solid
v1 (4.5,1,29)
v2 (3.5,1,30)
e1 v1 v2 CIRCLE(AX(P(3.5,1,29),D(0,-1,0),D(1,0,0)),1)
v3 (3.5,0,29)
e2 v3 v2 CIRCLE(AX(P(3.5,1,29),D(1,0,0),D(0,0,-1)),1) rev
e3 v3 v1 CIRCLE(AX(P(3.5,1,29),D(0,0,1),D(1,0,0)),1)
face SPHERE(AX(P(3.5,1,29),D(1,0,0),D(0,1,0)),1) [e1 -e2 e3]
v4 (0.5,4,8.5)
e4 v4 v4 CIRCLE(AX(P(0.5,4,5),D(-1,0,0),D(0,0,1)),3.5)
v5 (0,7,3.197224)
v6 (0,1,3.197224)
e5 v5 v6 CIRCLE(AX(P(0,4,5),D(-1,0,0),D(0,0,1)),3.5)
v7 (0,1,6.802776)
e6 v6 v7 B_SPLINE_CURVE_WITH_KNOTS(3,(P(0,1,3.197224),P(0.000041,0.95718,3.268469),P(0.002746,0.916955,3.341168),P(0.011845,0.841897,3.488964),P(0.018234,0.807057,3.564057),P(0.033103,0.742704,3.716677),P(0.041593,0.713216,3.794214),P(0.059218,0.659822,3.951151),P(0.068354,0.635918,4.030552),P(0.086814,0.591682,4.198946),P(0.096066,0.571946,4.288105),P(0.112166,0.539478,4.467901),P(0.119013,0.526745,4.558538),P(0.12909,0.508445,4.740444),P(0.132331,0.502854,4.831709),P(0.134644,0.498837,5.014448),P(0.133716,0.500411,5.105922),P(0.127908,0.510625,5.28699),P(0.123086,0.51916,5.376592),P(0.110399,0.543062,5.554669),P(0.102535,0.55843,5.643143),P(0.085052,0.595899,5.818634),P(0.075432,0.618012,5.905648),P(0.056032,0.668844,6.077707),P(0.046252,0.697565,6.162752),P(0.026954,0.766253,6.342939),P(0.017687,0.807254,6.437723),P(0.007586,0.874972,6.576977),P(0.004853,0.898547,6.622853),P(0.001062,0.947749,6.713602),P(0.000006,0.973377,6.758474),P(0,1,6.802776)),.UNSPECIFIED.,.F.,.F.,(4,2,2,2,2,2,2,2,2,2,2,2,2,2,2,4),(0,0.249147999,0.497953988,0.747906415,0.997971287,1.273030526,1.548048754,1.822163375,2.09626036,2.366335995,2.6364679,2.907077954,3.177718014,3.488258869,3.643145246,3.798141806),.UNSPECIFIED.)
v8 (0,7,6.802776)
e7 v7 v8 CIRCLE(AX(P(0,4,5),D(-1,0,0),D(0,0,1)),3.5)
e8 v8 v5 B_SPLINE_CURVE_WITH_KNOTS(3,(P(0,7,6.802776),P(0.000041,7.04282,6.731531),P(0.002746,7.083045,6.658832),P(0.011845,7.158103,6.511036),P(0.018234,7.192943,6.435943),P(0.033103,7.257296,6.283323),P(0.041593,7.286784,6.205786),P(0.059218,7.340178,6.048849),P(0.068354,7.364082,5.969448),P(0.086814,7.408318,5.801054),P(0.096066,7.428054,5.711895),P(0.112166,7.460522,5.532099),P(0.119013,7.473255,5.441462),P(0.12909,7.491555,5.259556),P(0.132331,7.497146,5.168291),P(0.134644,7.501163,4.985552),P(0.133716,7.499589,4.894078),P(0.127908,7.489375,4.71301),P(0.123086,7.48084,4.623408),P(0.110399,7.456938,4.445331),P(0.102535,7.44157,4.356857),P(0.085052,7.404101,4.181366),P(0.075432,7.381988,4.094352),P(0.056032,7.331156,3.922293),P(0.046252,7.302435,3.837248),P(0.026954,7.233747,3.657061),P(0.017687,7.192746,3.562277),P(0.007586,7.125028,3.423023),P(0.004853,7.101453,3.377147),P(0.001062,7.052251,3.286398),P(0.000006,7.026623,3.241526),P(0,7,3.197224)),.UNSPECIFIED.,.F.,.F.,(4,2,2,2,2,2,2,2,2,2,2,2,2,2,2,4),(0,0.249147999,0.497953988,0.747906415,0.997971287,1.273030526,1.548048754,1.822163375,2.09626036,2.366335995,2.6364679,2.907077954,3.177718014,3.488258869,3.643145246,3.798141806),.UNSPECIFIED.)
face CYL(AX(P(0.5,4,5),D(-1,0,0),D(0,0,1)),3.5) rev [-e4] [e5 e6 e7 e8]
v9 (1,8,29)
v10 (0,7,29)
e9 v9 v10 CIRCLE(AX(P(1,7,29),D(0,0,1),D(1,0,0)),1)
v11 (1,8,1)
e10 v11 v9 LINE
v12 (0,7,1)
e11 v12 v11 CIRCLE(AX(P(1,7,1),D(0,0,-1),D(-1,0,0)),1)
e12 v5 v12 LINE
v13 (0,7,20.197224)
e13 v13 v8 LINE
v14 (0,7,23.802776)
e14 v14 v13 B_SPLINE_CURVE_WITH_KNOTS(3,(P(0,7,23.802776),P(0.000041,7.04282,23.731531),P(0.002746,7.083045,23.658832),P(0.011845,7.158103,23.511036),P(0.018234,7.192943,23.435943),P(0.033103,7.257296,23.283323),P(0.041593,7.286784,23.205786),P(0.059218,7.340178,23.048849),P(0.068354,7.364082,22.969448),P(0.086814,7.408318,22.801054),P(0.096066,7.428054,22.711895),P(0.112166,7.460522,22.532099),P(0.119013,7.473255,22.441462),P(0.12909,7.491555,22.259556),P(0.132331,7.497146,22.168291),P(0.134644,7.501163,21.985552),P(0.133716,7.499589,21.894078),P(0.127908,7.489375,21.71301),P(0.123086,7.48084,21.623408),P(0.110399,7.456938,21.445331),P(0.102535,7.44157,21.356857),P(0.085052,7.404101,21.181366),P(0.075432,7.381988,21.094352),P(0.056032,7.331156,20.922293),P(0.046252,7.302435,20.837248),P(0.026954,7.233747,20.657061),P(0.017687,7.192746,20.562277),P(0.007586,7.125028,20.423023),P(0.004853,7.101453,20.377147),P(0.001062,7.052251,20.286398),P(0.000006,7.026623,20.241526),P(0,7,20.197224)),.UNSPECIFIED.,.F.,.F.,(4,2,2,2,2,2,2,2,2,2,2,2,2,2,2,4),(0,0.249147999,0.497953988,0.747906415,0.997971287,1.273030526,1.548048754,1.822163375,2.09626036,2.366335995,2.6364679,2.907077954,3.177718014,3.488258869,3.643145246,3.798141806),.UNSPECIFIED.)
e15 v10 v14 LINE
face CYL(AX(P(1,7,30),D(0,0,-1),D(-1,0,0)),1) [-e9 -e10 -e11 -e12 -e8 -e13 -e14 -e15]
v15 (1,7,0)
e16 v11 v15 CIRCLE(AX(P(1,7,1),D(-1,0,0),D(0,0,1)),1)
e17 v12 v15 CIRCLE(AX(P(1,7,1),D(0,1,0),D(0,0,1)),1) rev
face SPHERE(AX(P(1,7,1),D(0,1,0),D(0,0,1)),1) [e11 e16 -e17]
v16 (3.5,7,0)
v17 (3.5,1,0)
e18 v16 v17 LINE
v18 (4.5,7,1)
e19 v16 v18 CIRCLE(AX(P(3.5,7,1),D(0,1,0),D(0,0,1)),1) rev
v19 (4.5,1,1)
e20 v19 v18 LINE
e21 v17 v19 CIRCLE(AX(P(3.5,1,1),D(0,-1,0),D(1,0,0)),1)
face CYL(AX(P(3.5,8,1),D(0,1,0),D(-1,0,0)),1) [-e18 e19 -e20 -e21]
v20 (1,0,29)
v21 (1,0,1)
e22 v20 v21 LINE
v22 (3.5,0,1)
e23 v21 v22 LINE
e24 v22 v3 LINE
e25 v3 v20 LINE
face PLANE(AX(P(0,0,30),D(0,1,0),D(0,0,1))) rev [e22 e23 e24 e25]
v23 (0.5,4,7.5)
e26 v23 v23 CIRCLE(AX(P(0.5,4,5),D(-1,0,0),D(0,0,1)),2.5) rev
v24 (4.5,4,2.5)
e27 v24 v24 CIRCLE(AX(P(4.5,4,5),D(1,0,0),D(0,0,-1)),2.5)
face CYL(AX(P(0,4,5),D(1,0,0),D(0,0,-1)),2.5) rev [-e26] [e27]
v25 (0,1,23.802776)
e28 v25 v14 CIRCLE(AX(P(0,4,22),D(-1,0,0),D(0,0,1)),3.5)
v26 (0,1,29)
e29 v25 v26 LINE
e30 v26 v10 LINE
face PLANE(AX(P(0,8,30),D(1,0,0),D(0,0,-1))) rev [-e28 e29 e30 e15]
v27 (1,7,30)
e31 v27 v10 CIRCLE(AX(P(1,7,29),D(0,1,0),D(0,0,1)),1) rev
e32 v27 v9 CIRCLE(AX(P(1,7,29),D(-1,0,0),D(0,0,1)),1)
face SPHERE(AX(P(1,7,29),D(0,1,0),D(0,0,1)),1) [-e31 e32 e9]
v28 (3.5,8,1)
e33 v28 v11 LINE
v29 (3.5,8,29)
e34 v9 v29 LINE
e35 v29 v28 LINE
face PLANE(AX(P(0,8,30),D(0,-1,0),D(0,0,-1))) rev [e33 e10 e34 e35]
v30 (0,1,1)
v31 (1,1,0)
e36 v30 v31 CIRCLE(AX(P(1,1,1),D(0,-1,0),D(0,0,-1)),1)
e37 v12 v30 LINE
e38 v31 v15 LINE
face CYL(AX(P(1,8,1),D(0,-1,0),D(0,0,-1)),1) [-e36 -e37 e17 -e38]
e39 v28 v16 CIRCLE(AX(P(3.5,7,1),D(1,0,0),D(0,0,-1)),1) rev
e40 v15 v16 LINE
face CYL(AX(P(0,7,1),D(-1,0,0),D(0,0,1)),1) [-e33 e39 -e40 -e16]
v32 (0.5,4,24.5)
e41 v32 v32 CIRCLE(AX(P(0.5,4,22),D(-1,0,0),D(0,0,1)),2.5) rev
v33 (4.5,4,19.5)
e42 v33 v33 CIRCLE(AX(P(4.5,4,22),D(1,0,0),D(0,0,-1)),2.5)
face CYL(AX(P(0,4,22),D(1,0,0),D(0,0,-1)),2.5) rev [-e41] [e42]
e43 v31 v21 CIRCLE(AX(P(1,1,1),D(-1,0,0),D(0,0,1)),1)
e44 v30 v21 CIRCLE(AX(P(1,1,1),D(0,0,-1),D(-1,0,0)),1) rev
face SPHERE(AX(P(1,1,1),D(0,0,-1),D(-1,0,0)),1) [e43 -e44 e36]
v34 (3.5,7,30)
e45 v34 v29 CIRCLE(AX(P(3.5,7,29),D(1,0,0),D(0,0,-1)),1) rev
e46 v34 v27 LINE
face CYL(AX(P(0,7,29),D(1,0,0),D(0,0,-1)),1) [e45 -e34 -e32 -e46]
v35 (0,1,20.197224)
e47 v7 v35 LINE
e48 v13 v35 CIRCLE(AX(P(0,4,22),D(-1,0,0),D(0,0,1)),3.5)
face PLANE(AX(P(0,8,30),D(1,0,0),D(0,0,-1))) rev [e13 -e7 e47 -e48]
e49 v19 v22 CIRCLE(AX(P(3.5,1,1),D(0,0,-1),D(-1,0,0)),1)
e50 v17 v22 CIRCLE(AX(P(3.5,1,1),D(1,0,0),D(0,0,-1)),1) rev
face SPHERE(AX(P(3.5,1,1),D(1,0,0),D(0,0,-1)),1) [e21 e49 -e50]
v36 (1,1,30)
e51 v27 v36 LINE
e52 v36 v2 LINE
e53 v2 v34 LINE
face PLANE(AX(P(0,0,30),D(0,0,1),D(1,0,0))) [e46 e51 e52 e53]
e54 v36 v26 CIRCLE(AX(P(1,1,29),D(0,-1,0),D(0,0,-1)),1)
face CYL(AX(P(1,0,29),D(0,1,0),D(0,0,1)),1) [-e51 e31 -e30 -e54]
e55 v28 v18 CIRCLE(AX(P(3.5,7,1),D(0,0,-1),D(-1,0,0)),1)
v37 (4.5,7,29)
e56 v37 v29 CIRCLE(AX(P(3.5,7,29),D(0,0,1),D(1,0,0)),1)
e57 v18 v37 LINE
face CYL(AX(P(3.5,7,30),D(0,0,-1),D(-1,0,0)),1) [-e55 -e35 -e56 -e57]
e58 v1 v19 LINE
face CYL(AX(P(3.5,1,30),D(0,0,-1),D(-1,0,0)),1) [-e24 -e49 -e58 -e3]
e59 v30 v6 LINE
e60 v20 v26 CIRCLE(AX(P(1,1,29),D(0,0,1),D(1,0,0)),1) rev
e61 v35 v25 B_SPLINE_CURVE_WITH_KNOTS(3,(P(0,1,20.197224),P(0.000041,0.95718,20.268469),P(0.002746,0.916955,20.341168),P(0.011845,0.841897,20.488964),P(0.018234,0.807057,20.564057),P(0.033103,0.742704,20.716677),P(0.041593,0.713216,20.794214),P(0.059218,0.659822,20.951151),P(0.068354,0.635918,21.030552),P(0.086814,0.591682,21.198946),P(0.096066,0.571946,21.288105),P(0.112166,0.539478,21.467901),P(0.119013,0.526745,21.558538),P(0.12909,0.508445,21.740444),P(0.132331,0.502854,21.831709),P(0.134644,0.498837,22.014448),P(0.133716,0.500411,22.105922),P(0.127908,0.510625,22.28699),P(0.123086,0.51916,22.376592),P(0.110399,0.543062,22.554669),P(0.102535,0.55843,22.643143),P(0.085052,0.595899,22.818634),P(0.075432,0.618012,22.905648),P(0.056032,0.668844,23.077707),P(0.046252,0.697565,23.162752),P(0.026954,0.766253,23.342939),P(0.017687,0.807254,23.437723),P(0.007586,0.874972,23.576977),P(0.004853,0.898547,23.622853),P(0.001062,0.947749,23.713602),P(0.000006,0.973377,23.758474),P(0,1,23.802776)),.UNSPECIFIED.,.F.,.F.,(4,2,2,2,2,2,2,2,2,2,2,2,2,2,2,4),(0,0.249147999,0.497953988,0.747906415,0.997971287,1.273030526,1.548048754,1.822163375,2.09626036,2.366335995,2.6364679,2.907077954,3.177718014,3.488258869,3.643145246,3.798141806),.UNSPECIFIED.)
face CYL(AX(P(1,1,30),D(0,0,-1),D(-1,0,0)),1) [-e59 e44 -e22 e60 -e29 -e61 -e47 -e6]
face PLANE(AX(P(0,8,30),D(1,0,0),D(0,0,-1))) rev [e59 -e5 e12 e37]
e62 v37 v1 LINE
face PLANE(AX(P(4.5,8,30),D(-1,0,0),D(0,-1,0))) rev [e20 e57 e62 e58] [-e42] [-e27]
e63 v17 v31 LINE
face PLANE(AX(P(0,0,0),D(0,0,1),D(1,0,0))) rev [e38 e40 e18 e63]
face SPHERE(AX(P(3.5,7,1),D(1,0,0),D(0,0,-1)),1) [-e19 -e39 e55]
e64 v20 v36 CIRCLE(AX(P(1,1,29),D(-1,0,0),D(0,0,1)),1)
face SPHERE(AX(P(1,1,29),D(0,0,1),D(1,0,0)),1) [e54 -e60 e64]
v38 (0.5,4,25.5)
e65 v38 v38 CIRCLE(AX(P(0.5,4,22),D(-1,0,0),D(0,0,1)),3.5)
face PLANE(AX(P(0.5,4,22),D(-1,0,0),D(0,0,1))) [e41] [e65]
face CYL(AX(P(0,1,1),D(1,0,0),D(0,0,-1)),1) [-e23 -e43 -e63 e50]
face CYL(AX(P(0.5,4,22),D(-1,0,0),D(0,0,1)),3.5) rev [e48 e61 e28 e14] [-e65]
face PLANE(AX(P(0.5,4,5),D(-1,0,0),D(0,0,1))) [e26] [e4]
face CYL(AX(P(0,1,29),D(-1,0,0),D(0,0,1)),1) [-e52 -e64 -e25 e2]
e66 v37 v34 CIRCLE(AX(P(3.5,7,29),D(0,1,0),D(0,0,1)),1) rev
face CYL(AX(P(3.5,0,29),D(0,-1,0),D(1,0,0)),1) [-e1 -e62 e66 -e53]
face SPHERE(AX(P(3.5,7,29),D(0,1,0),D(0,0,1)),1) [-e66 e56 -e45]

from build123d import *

# Parameters (mm, degrees)
SKETCH_1_W          = 4.5
SKETCH_1_H          = 8
EXTRUDE_1_DEPTH     = 30
SKETCH_4_R          = 2.5
CUT_EXTRUDE_2_DEPTH = 32.372758884
SKETCH_7_R          = 3.5
CUT_EXTRUDE_4_DEPTH = 0.5
FILLET_1_R          = 1


with BuildPart() as part:
    # 草图1 → 凸台-拉伸1 (new body)
    with BuildSketch(Plane.XY):
        with Locations((2.25, 4)):
            Rectangle(SKETCH_1_W, SKETCH_1_H)
    extrude(amount=EXTRUDE_1_DEPTH)

    # 草图4 → 切除-拉伸2 (cut, through all)
    with BuildSketch(Plane(origin=(4.5, 0, 0), x_dir=(0, 0, -1), z_dir=(1, 0, 0))):
        with Locations((-5, 4)):
            Circle(SKETCH_4_R)
        with Locations((-22, 4)):
            Circle(SKETCH_4_R)
    extrude(amount=-CUT_EXTRUDE_2_DEPTH, mode=Mode.SUBTRACT)

    # 草图7 → 切除-拉伸4 (cut)
    with BuildSketch(Plane.ZY):
        with Locations((5, 4)):
            Circle(SKETCH_7_R)
        with Locations((22, 4)):
            Circle(SKETCH_7_R)
    extrude(amount=-CUT_EXTRUDE_4_DEPTH, mode=Mode.SUBTRACT)

    # 圆角1
    # the kernel refuses this fillet: 1 mm, written as the material it takes off along each edge
    with BuildSketch(Plane(origin=(3.5, 7, 29), x_dir=(1, 0, 0), z_dir=(0, 1, 0))) as fillet_1_piece_1_section:
        Polygon((0, 0), (FILLET_1_R, 0), (FILLET_1_R, -FILLET_1_R), (0, -FILLET_1_R), align=None)
    fillet_1_piece_1 = extrude(amount=FILLET_1_R, mode=Mode.PRIVATE)
    fillet_1_piece_1 = fillet_1_piece_1 - Plane(origin=(3.5, 7, 29), x_dir=(-0.7071067811865475, 0, -0.7071067811865475), z_dir=(0, 1, 0)) * Sphere(FILLET_1_R, mode=Mode.PRIVATE)
    add(fillet_1_piece_1, mode=Mode.SUBTRACT)
    with BuildSketch(Plane(origin=(3.5, 1, 29), x_dir=(0, 0, 1), z_dir=(1, 0, 0))) as fillet_1_piece_2_section:
        Polygon((0, 0), (FILLET_1_R, 0), (FILLET_1_R, FILLET_1_R), (0, FILLET_1_R), align=None)
    fillet_1_piece_2 = extrude(amount=FILLET_1_R, mode=Mode.PRIVATE)
    fillet_1_piece_2 = fillet_1_piece_2 - Plane(origin=(3.5, 1, 29), x_dir=(0, 0.7071067811865475, -0.7071067811865475), z_dir=(1, 0, 0)) * Sphere(FILLET_1_R, mode=Mode.PRIVATE)
    add(fillet_1_piece_2, mode=Mode.SUBTRACT)
    with BuildSketch(Plane(origin=(1, 7, 29), x_dir=(-1, 0, 0), z_dir=(0, 1, 0))) as fillet_1_piece_3_section:
        Polygon((0, 0), (FILLET_1_R, 0), (FILLET_1_R, FILLET_1_R), (0, FILLET_1_R), align=None)
    fillet_1_piece_3 = extrude(amount=FILLET_1_R, mode=Mode.PRIVATE)
    fillet_1_piece_3 = fillet_1_piece_3 - Plane(origin=(1, 7, 29), x_dir=(0.7071067811865475, 0, -0.7071067811865475), z_dir=(0, 1, 0)) * Sphere(FILLET_1_R, mode=Mode.PRIVATE)
    add(fillet_1_piece_3, mode=Mode.SUBTRACT)
    with BuildSketch(Plane(origin=(1, 1, 29), x_dir=(0, 0, 1), z_dir=(-1, 0, 0))) as fillet_1_piece_4_section:
        Polygon((0, 0), (FILLET_1_R, 0), (FILLET_1_R, -FILLET_1_R), (0, -FILLET_1_R), align=None)
    fillet_1_piece_4 = extrude(amount=FILLET_1_R, mode=Mode.PRIVATE)
    fillet_1_piece_4 = fillet_1_piece_4 - Plane(origin=(1, 1, 29), x_dir=(0, 0.7071067811865475, -0.7071067811865475), z_dir=(-1, 0, 0)) * Sphere(FILLET_1_R, mode=Mode.PRIVATE)
    add(fillet_1_piece_4, mode=Mode.SUBTRACT)
    with BuildSketch(Plane(origin=(1, 7, 1), x_dir=(-1, 0, 0), z_dir=(0, 1, 0))) as fillet_1_piece_5_section:
        Polygon((0, 0), (FILLET_1_R, 0), (FILLET_1_R, -FILLET_1_R), (0, -FILLET_1_R), align=None)
    fillet_1_piece_5 = extrude(amount=FILLET_1_R, mode=Mode.PRIVATE)
    fillet_1_piece_5 = fillet_1_piece_5 - Plane(origin=(1, 7, 1), x_dir=(0.7071067811865475, 0, 0.7071067811865475), z_dir=(0, 1, 0)) * Sphere(FILLET_1_R, mode=Mode.PRIVATE)
    add(fillet_1_piece_5, mode=Mode.SUBTRACT)
    with BuildSketch(Plane(origin=(3.5, 7, 1), x_dir=(1, 0, 0), z_dir=(0, 1, 0))) as fillet_1_piece_6_section:
        Polygon((0, 0), (FILLET_1_R, 0), (FILLET_1_R, FILLET_1_R), (0, FILLET_1_R), align=None)
    fillet_1_piece_6 = extrude(amount=FILLET_1_R, mode=Mode.PRIVATE)
    fillet_1_piece_6 = fillet_1_piece_6 - Plane(origin=(3.5, 7, 1), x_dir=(-0.7071067811865475, 0, 0.7071067811865475), z_dir=(0, 1, 0)) * Sphere(FILLET_1_R, mode=Mode.PRIVATE)
    add(fillet_1_piece_6, mode=Mode.SUBTRACT)
    with BuildSketch(Plane(origin=(3.5, 1, 1), x_dir=(0, 0, -1), z_dir=(1, 0, 0))) as fillet_1_piece_7_section:
        Polygon((0, 0), (FILLET_1_R, 0), (FILLET_1_R, -FILLET_1_R), (0, -FILLET_1_R), align=None)
    fillet_1_piece_7 = extrude(amount=FILLET_1_R, mode=Mode.PRIVATE)
    fillet_1_piece_7 = fillet_1_piece_7 - Plane(origin=(3.5, 1, 1), x_dir=(0, 0.7071067811865475, 0.7071067811865475), z_dir=(1, 0, 0)) * Sphere(FILLET_1_R, mode=Mode.PRIVATE)
    add(fillet_1_piece_7, mode=Mode.SUBTRACT)
    with BuildSketch(Plane(origin=(1, 1, 1), x_dir=(0, 0, -1), z_dir=(-1, 0, 0))) as fillet_1_piece_8_section:
        Polygon((0, 0), (FILLET_1_R, 0), (FILLET_1_R, FILLET_1_R), (0, FILLET_1_R), align=None)
    fillet_1_piece_8 = extrude(amount=FILLET_1_R, mode=Mode.PRIVATE)
    fillet_1_piece_8 = fillet_1_piece_8 - Plane(origin=(1, 1, 1), x_dir=(0, 0.7071067811865475, 0.7071067811865475), z_dir=(-1, 0, 0)) * Sphere(FILLET_1_R, mode=Mode.PRIVATE)
    add(fillet_1_piece_8, mode=Mode.SUBTRACT)
    with BuildSketch(Plane(origin=(4.5, 7, 30), x_dir=(0, 0, -1), z_dir=(0, -1, 0)), Plane(origin=(0, 1, 30), x_dir=(0, 0, -1), z_dir=(0, 1, 0))) as fillet_1_piece_9:
        with BuildLine():
            CenterArc((FILLET_1_R, -FILLET_1_R), FILLET_1_R, 90, 90)
            Line((0, -FILLET_1_R), (0, 0))
            Line((0, 0), (FILLET_1_R, 0))
        make_face()
    extrude(amount=6, mode=Mode.SUBTRACT)
    with BuildSketch(Plane(origin=(1, 8, 30), x_dir=(0, 0, -1), z_dir=(1, 0, 0)), Plane(origin=(3.5, 0, 0), x_dir=(0, 1, 0), z_dir=(-1, 0, 0))) as fillet_1_piece_10:
        with BuildLine():
            CenterArc((FILLET_1_R, -FILLET_1_R), FILLET_1_R, 90, 90)
            Line((0, -FILLET_1_R), (0, 0))
            Line((0, 0), (FILLET_1_R, 0))
        make_face()
    extrude(amount=2.5, mode=Mode.SUBTRACT)
    with BuildSketch(Plane(origin=(1, 8, 0), x_dir=(0, 0, 1), z_dir=(1, 0, 0)), Plane(origin=(3.5, 0, 30), x_dir=(0, 1, 0), z_dir=(-1, 0, 0))) as fillet_1_piece_11:
        with BuildLine():
            CenterArc((FILLET_1_R, FILLET_1_R), FILLET_1_R, 180, 90)
            Line((0, FILLET_1_R), (0, 0))
            Line((0, 0), (FILLET_1_R, 0))
        make_face()
    extrude(amount=2.5, mode=Mode.SUBTRACT)
    with BuildSketch(Plane(origin=(4.5, 7, 0), x_dir=(0, 0, 1), z_dir=(0, -1, 0)), Plane(origin=(0, 1, 0), x_dir=(0, 0, 1), z_dir=(0, 1, 0))) as fillet_1_piece_12:
        with BuildLine():
            CenterArc((FILLET_1_R, FILLET_1_R), FILLET_1_R, 180, 90)
            Line((0, FILLET_1_R), (0, 0))
            Line((0, 0), (FILLET_1_R, 0))
        make_face()
    extrude(amount=6, mode=Mode.SUBTRACT)
    with BuildSketch(Plane(origin=(0, 8, 1), x_dir=(1, 0, 0), z_dir=(0, 0, 1)), Plane(origin=(0, 0, 1), x_dir=(0, 1, 0), z_dir=(0, 0, 1))) as fillet_1_piece_13:
        with BuildLine():
            CenterArc((FILLET_1_R, -FILLET_1_R), FILLET_1_R, 90, 90)
            Line((0, -FILLET_1_R), (0, 0))
            Line((0, 0), (FILLET_1_R, 0))
        make_face()
    extrude(amount=28, mode=Mode.SUBTRACT)
    with BuildSketch(Plane(origin=(4.5, 8, 1), x_dir=(-1, 0, 0), z_dir=(0, 0, 1)), Plane(origin=(4.5, 0, 1), x_dir=(0, 1, 0), z_dir=(0, 0, 1))) as fillet_1_piece_14:
        with BuildLine():
            CenterArc((FILLET_1_R, FILLET_1_R), FILLET_1_R, 180, 90)
            Line((0, FILLET_1_R), (0, 0))
            Line((0, 0), (FILLET_1_R, 0))
        make_face()
    extrude(amount=28, mode=Mode.SUBTRACT)


solid = part.part
